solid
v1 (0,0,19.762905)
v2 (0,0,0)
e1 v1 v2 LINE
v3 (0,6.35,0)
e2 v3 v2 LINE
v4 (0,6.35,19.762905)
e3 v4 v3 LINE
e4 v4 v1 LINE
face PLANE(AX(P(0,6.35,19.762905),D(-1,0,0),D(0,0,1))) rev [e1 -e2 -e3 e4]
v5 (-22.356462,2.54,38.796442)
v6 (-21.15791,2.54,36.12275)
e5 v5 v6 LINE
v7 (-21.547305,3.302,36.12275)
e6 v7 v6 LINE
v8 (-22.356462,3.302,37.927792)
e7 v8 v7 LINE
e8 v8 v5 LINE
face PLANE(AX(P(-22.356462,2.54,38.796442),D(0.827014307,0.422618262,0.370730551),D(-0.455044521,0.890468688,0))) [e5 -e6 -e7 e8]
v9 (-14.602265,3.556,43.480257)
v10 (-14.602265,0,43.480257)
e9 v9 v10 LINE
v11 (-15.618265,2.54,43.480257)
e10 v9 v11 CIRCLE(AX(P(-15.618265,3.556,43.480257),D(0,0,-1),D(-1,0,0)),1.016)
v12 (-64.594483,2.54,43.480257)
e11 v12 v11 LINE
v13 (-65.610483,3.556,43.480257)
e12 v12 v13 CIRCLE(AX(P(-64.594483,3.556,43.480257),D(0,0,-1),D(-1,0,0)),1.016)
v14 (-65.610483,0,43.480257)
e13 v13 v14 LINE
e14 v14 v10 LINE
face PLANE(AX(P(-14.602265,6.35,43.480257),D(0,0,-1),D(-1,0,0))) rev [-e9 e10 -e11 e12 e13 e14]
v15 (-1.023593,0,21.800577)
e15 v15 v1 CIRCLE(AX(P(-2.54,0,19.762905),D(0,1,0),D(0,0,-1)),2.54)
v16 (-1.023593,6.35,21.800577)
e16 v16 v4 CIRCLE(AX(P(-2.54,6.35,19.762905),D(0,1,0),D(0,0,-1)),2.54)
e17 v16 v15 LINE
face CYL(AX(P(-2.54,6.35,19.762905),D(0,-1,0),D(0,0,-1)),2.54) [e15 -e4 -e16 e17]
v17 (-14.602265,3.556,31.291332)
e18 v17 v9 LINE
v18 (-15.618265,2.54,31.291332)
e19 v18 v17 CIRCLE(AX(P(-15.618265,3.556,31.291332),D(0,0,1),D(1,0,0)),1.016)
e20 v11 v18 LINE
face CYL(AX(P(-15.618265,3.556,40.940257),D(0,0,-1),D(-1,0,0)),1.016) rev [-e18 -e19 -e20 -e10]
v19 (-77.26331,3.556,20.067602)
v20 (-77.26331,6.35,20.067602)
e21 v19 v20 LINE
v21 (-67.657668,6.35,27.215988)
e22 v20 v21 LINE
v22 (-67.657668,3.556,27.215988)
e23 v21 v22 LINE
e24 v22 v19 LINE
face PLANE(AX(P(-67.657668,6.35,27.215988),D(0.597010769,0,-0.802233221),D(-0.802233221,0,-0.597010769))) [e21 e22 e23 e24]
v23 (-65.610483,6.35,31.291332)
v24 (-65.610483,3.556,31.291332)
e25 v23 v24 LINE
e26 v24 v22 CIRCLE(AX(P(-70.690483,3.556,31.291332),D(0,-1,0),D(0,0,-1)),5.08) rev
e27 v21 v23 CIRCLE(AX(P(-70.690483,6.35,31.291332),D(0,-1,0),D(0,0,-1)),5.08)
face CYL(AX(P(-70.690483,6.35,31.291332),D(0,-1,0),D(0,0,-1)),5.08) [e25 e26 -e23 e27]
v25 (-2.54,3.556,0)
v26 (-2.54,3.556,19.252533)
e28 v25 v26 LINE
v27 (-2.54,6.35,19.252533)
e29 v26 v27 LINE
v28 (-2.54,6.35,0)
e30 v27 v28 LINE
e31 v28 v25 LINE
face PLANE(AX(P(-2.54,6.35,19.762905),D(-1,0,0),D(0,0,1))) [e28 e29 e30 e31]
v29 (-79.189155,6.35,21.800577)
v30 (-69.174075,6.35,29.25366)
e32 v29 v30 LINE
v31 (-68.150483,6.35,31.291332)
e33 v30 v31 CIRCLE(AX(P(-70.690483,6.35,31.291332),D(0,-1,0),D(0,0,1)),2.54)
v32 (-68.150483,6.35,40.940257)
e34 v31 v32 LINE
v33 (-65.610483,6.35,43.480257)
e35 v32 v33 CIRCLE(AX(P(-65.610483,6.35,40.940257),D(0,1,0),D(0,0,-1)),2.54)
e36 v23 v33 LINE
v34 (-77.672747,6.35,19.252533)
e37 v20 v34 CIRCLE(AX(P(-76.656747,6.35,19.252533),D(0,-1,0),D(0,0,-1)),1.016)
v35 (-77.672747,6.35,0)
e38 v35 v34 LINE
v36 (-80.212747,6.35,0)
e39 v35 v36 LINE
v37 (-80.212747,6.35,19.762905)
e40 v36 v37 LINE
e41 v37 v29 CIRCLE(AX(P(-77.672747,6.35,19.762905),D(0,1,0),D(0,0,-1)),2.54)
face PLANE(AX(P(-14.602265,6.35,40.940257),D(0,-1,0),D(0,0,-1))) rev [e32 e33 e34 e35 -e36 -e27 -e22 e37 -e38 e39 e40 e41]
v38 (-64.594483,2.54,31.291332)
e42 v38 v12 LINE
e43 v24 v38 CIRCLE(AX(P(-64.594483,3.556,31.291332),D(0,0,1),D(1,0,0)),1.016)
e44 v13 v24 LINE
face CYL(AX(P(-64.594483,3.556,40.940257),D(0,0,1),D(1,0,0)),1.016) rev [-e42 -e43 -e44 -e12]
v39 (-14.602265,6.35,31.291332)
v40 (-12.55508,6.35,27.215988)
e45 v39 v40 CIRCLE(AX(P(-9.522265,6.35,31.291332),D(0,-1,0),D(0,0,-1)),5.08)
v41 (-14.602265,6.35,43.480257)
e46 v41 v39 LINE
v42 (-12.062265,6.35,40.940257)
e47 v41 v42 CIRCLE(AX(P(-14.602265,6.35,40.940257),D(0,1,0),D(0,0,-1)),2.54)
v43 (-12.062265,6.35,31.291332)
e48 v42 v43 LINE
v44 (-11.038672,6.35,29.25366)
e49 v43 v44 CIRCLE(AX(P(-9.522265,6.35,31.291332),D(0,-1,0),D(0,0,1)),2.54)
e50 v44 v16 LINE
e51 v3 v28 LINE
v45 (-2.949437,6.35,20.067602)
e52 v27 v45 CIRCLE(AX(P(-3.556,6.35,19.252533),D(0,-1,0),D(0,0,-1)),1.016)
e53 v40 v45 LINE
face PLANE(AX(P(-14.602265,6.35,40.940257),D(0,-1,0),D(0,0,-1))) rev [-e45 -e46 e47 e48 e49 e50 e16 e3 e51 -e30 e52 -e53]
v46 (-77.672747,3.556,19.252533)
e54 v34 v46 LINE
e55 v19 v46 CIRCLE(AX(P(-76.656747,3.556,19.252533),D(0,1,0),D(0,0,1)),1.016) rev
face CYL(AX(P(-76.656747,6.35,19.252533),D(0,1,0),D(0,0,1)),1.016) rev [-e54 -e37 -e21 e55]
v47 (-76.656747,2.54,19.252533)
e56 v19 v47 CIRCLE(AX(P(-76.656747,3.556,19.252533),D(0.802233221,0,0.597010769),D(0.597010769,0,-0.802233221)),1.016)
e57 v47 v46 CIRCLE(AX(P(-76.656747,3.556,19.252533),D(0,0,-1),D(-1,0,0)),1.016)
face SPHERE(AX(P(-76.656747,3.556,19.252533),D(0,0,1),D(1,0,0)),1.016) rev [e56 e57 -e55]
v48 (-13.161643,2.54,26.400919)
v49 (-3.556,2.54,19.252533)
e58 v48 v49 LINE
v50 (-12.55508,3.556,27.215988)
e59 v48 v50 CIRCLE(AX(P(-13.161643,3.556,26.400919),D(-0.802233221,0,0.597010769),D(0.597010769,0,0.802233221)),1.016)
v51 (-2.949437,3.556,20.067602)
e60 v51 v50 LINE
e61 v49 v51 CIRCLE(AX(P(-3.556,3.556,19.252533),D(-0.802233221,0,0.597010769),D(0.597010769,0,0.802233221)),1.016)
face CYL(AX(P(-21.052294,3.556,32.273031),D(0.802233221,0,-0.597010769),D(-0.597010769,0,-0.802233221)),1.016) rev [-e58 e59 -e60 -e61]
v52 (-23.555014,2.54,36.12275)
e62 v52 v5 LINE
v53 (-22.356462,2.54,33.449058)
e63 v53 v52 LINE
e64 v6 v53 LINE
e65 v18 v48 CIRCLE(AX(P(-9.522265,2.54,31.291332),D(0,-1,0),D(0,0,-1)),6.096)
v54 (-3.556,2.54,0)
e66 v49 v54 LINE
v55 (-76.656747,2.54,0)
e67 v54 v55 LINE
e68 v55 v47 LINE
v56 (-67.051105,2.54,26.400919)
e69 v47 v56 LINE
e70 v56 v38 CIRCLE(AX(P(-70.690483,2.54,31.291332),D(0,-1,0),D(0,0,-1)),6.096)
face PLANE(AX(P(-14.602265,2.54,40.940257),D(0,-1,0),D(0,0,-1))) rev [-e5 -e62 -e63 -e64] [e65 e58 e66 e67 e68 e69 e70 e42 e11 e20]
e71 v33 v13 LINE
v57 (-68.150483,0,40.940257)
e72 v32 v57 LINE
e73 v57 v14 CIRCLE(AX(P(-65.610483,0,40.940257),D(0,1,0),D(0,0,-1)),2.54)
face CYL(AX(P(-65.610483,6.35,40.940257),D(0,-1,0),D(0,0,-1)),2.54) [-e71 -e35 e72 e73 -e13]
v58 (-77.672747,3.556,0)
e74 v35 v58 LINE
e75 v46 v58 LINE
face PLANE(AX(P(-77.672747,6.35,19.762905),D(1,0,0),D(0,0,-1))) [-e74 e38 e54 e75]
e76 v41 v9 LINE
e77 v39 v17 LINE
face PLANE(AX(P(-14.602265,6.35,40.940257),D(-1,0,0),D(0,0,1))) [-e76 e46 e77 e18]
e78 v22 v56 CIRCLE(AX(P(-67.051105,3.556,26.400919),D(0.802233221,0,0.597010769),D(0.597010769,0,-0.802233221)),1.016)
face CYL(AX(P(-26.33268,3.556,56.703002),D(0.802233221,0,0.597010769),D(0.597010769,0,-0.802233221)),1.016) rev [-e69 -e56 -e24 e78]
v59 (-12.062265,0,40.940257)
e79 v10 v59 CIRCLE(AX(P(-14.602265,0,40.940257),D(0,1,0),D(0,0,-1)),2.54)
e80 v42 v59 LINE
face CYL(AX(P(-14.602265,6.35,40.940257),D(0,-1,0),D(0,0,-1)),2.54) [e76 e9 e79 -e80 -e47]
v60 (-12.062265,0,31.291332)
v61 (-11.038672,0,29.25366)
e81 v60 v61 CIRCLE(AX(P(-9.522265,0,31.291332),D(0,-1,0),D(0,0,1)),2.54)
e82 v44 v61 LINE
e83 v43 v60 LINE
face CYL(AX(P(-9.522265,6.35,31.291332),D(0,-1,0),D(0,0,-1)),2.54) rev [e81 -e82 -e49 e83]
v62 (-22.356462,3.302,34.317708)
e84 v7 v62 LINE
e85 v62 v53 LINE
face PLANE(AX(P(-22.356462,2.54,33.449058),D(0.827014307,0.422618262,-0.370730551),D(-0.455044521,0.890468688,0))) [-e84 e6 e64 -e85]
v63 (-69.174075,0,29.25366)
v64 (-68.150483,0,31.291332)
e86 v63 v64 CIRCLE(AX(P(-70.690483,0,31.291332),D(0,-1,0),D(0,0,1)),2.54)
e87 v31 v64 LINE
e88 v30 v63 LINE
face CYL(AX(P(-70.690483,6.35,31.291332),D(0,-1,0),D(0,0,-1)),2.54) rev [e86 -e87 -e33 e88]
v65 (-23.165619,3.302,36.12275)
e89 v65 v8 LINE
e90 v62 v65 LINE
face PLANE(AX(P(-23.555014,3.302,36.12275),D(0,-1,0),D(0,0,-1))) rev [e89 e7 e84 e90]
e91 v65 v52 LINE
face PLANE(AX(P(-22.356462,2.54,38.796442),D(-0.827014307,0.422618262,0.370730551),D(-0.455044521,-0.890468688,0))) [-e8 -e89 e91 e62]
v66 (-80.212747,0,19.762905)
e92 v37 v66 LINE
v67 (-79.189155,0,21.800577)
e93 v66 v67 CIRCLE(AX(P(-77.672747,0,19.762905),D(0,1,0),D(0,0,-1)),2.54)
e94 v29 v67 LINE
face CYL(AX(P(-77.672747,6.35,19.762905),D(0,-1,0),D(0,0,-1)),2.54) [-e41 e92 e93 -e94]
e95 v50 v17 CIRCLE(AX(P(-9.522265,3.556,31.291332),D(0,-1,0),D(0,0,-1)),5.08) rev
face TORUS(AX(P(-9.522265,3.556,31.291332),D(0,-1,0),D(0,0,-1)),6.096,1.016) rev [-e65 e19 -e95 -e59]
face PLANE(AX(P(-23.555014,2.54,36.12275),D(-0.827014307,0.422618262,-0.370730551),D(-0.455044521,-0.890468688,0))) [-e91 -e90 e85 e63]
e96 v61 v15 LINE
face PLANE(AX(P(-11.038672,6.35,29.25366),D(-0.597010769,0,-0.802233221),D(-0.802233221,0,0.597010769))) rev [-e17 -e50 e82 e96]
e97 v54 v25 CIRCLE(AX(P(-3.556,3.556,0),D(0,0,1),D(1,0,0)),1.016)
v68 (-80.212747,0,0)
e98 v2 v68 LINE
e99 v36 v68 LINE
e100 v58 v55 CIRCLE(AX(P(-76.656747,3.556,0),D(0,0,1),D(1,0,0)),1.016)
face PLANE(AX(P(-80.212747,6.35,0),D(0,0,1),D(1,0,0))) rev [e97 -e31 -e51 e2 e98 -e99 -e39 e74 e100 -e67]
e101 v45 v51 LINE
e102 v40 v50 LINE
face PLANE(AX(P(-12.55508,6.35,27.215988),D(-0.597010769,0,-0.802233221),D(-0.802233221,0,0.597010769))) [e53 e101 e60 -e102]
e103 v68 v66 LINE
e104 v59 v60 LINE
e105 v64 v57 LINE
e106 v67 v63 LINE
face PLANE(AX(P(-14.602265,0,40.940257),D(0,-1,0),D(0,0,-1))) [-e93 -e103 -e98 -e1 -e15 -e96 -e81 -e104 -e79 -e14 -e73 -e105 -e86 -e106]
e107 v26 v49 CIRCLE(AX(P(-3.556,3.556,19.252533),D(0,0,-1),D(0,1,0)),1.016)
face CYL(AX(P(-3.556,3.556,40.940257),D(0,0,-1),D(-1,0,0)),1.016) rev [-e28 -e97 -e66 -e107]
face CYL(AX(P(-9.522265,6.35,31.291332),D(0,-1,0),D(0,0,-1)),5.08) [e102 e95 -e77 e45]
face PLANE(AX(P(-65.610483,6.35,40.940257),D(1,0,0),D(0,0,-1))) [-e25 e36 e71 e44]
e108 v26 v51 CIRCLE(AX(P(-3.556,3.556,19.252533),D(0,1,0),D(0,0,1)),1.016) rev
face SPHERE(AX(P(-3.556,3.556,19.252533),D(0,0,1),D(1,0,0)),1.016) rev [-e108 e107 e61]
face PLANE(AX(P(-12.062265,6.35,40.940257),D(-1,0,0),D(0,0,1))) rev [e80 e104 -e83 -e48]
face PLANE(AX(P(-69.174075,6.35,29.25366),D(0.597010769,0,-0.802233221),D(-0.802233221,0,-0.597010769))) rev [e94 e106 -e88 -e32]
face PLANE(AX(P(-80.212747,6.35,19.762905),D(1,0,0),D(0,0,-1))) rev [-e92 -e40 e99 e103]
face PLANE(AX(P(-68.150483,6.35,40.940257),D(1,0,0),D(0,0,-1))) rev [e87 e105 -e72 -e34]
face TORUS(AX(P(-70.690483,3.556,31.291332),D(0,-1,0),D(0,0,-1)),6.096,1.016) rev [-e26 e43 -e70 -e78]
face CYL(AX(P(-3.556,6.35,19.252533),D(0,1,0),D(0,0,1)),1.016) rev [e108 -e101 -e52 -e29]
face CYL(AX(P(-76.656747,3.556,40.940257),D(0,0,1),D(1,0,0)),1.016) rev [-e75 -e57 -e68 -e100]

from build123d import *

# Parameters (mm, degrees)
EXTRUDE1_DEPTH = 6.35
SHELL1_START   = 2.54
SHELL1_DEPTH   = 3.81
FILLET2_R      = 1.016
EXTRUDE2_DEPTH = 0.762
EXTRUDE2_TAPER = 25


# Read off the part's stored shape, not the designer's step: Shell1
with BuildPart() as part:
    # Sketch1 → Extrude1 (new body)
    with BuildSketch(Plane(origin=(0, 0, 0), x_dir=(1, 0, 0), z_dir=(0, 1, 0))):
        with BuildLine():
            Line((-14.602264877, -43.480257116), (-65.610482537, -43.480257116))
            ThreePointArc((-65.610482537, -43.480257116), (-67.406533761, -42.73630834), (-68.150482537, -40.940257116))
            Line((-68.150482537, -40.940257116), (-68.150482537, -31.291332317))
            ThreePointArc((-68.150482537, -31.291332317), (-68.420760673, -30.151173267), (-69.174075183, -29.253659935))
            Line((-69.174075183, -29.253659935), (-79.189154769, -21.800577453))
            ThreePointArc((-79.189154769, -21.800577453), (-79.942469279, -20.903064121), (-80.212747415, -19.762905071))
            Line((-80.212747415, -19.762905071), (-80.212747415, 0))
            Line((-80.212747415, 0), (0, 0))
            Line((0, 0), (0, -19.762905071))
            ThreePointArc((0, -19.762905071), (-0.270278136, -20.903064121), (-1.023592646, -21.800577453))
            Line((-1.023592646, -21.800577453), (-11.038672231, -29.253659935))
            ThreePointArc((-11.038672231, -29.253659935), (-11.791986741, -30.151173267), (-12.062264877, -31.291332317))
            Line((-12.062264877, -31.291332317), (-12.062264877, -40.940257116))
            ThreePointArc((-12.062264877, -40.940257116), (-12.806213653, -42.73630834), (-14.602264877, -43.480257116))
        make_face()
    extrude(amount=EXTRUDE1_DEPTH)

    # Shell1 outline → Shell1 (cut)
    with BuildSketch(Plane(origin=(0, 0, 0), x_dir=(1, 0, 0), z_dir=(0, 1, 0)).offset(SHELL1_START)):
        with BuildLine():
            Line((-14.602264877, -43.480257116), (-14.602264877, -31.291332317))
            ThreePointArc((-14.602264877, -31.291332317), (-14.061708605, -29.011014216), (-12.555079586, -27.215987553))
            Line((-12.555079586, -27.215987553), (-2.54, -19.762905071))
            Line((-2.54, -19.762905071), (-2.54, 0))
            Line((-2.54, 0), (-77.672747415, 0))
            Line((-77.672747415, 0), (-77.672747415, -19.762905071))
            Line((-77.672747415, -19.762905071), (-67.657667829, -27.215987553))
            ThreePointArc((-67.657667829, -27.215987553), (-66.151038809, -29.011014216), (-65.610482537, -31.291332317))
            Line((-65.610482537, -31.291332317), (-65.610482537, -43.480257116))
            Line((-65.610482537, -43.480257116), (-14.602264877, -43.480257116))
        make_face()
    extrude(amount=SHELL1_DEPTH, mode=Mode.SUBTRACT)

    # Fillet2
    fillet2_edges = [part.edges().sort_by_distance(p)[0] for p in [
        (-14.602264877, 2.54, 37.385794717),
        (-14.061708605, 2.54, 29.011014216),
        (-7.547539793, 2.54, 23.489446312),
        (-2.54, 2.54, 9.881452535),
        (-2.54, 4.445, 19.762905071),
        (-77.672747415, 2.54, 9.881452535),
        (-72.665207622, 2.54, 23.489446312),
        (-77.672747415, 4.445, 19.762905071),
        (-66.151038809, 2.54, 29.011014216),
        (-65.610482537, 2.54, 37.385794717),
    ]]
    fillet(fillet2_edges, radius=FILLET2_R)

    # Sketch3 → Extrude2 (add)
    with BuildSketch(Plane(origin=(0, 2.54, 0), x_dir=(-1, 0, 0), z_dir=(0, 1, 0))):
        Polygon((22.356461774, 33.449057502), (23.555013556, 36.122749938), (22.356461774, 38.796442374), (21.157909992, 36.122749938), align=None)
    extrude(amount=EXTRUDE2_DEPTH, taper=EXTRUDE2_TAPER)


solid = part.part
